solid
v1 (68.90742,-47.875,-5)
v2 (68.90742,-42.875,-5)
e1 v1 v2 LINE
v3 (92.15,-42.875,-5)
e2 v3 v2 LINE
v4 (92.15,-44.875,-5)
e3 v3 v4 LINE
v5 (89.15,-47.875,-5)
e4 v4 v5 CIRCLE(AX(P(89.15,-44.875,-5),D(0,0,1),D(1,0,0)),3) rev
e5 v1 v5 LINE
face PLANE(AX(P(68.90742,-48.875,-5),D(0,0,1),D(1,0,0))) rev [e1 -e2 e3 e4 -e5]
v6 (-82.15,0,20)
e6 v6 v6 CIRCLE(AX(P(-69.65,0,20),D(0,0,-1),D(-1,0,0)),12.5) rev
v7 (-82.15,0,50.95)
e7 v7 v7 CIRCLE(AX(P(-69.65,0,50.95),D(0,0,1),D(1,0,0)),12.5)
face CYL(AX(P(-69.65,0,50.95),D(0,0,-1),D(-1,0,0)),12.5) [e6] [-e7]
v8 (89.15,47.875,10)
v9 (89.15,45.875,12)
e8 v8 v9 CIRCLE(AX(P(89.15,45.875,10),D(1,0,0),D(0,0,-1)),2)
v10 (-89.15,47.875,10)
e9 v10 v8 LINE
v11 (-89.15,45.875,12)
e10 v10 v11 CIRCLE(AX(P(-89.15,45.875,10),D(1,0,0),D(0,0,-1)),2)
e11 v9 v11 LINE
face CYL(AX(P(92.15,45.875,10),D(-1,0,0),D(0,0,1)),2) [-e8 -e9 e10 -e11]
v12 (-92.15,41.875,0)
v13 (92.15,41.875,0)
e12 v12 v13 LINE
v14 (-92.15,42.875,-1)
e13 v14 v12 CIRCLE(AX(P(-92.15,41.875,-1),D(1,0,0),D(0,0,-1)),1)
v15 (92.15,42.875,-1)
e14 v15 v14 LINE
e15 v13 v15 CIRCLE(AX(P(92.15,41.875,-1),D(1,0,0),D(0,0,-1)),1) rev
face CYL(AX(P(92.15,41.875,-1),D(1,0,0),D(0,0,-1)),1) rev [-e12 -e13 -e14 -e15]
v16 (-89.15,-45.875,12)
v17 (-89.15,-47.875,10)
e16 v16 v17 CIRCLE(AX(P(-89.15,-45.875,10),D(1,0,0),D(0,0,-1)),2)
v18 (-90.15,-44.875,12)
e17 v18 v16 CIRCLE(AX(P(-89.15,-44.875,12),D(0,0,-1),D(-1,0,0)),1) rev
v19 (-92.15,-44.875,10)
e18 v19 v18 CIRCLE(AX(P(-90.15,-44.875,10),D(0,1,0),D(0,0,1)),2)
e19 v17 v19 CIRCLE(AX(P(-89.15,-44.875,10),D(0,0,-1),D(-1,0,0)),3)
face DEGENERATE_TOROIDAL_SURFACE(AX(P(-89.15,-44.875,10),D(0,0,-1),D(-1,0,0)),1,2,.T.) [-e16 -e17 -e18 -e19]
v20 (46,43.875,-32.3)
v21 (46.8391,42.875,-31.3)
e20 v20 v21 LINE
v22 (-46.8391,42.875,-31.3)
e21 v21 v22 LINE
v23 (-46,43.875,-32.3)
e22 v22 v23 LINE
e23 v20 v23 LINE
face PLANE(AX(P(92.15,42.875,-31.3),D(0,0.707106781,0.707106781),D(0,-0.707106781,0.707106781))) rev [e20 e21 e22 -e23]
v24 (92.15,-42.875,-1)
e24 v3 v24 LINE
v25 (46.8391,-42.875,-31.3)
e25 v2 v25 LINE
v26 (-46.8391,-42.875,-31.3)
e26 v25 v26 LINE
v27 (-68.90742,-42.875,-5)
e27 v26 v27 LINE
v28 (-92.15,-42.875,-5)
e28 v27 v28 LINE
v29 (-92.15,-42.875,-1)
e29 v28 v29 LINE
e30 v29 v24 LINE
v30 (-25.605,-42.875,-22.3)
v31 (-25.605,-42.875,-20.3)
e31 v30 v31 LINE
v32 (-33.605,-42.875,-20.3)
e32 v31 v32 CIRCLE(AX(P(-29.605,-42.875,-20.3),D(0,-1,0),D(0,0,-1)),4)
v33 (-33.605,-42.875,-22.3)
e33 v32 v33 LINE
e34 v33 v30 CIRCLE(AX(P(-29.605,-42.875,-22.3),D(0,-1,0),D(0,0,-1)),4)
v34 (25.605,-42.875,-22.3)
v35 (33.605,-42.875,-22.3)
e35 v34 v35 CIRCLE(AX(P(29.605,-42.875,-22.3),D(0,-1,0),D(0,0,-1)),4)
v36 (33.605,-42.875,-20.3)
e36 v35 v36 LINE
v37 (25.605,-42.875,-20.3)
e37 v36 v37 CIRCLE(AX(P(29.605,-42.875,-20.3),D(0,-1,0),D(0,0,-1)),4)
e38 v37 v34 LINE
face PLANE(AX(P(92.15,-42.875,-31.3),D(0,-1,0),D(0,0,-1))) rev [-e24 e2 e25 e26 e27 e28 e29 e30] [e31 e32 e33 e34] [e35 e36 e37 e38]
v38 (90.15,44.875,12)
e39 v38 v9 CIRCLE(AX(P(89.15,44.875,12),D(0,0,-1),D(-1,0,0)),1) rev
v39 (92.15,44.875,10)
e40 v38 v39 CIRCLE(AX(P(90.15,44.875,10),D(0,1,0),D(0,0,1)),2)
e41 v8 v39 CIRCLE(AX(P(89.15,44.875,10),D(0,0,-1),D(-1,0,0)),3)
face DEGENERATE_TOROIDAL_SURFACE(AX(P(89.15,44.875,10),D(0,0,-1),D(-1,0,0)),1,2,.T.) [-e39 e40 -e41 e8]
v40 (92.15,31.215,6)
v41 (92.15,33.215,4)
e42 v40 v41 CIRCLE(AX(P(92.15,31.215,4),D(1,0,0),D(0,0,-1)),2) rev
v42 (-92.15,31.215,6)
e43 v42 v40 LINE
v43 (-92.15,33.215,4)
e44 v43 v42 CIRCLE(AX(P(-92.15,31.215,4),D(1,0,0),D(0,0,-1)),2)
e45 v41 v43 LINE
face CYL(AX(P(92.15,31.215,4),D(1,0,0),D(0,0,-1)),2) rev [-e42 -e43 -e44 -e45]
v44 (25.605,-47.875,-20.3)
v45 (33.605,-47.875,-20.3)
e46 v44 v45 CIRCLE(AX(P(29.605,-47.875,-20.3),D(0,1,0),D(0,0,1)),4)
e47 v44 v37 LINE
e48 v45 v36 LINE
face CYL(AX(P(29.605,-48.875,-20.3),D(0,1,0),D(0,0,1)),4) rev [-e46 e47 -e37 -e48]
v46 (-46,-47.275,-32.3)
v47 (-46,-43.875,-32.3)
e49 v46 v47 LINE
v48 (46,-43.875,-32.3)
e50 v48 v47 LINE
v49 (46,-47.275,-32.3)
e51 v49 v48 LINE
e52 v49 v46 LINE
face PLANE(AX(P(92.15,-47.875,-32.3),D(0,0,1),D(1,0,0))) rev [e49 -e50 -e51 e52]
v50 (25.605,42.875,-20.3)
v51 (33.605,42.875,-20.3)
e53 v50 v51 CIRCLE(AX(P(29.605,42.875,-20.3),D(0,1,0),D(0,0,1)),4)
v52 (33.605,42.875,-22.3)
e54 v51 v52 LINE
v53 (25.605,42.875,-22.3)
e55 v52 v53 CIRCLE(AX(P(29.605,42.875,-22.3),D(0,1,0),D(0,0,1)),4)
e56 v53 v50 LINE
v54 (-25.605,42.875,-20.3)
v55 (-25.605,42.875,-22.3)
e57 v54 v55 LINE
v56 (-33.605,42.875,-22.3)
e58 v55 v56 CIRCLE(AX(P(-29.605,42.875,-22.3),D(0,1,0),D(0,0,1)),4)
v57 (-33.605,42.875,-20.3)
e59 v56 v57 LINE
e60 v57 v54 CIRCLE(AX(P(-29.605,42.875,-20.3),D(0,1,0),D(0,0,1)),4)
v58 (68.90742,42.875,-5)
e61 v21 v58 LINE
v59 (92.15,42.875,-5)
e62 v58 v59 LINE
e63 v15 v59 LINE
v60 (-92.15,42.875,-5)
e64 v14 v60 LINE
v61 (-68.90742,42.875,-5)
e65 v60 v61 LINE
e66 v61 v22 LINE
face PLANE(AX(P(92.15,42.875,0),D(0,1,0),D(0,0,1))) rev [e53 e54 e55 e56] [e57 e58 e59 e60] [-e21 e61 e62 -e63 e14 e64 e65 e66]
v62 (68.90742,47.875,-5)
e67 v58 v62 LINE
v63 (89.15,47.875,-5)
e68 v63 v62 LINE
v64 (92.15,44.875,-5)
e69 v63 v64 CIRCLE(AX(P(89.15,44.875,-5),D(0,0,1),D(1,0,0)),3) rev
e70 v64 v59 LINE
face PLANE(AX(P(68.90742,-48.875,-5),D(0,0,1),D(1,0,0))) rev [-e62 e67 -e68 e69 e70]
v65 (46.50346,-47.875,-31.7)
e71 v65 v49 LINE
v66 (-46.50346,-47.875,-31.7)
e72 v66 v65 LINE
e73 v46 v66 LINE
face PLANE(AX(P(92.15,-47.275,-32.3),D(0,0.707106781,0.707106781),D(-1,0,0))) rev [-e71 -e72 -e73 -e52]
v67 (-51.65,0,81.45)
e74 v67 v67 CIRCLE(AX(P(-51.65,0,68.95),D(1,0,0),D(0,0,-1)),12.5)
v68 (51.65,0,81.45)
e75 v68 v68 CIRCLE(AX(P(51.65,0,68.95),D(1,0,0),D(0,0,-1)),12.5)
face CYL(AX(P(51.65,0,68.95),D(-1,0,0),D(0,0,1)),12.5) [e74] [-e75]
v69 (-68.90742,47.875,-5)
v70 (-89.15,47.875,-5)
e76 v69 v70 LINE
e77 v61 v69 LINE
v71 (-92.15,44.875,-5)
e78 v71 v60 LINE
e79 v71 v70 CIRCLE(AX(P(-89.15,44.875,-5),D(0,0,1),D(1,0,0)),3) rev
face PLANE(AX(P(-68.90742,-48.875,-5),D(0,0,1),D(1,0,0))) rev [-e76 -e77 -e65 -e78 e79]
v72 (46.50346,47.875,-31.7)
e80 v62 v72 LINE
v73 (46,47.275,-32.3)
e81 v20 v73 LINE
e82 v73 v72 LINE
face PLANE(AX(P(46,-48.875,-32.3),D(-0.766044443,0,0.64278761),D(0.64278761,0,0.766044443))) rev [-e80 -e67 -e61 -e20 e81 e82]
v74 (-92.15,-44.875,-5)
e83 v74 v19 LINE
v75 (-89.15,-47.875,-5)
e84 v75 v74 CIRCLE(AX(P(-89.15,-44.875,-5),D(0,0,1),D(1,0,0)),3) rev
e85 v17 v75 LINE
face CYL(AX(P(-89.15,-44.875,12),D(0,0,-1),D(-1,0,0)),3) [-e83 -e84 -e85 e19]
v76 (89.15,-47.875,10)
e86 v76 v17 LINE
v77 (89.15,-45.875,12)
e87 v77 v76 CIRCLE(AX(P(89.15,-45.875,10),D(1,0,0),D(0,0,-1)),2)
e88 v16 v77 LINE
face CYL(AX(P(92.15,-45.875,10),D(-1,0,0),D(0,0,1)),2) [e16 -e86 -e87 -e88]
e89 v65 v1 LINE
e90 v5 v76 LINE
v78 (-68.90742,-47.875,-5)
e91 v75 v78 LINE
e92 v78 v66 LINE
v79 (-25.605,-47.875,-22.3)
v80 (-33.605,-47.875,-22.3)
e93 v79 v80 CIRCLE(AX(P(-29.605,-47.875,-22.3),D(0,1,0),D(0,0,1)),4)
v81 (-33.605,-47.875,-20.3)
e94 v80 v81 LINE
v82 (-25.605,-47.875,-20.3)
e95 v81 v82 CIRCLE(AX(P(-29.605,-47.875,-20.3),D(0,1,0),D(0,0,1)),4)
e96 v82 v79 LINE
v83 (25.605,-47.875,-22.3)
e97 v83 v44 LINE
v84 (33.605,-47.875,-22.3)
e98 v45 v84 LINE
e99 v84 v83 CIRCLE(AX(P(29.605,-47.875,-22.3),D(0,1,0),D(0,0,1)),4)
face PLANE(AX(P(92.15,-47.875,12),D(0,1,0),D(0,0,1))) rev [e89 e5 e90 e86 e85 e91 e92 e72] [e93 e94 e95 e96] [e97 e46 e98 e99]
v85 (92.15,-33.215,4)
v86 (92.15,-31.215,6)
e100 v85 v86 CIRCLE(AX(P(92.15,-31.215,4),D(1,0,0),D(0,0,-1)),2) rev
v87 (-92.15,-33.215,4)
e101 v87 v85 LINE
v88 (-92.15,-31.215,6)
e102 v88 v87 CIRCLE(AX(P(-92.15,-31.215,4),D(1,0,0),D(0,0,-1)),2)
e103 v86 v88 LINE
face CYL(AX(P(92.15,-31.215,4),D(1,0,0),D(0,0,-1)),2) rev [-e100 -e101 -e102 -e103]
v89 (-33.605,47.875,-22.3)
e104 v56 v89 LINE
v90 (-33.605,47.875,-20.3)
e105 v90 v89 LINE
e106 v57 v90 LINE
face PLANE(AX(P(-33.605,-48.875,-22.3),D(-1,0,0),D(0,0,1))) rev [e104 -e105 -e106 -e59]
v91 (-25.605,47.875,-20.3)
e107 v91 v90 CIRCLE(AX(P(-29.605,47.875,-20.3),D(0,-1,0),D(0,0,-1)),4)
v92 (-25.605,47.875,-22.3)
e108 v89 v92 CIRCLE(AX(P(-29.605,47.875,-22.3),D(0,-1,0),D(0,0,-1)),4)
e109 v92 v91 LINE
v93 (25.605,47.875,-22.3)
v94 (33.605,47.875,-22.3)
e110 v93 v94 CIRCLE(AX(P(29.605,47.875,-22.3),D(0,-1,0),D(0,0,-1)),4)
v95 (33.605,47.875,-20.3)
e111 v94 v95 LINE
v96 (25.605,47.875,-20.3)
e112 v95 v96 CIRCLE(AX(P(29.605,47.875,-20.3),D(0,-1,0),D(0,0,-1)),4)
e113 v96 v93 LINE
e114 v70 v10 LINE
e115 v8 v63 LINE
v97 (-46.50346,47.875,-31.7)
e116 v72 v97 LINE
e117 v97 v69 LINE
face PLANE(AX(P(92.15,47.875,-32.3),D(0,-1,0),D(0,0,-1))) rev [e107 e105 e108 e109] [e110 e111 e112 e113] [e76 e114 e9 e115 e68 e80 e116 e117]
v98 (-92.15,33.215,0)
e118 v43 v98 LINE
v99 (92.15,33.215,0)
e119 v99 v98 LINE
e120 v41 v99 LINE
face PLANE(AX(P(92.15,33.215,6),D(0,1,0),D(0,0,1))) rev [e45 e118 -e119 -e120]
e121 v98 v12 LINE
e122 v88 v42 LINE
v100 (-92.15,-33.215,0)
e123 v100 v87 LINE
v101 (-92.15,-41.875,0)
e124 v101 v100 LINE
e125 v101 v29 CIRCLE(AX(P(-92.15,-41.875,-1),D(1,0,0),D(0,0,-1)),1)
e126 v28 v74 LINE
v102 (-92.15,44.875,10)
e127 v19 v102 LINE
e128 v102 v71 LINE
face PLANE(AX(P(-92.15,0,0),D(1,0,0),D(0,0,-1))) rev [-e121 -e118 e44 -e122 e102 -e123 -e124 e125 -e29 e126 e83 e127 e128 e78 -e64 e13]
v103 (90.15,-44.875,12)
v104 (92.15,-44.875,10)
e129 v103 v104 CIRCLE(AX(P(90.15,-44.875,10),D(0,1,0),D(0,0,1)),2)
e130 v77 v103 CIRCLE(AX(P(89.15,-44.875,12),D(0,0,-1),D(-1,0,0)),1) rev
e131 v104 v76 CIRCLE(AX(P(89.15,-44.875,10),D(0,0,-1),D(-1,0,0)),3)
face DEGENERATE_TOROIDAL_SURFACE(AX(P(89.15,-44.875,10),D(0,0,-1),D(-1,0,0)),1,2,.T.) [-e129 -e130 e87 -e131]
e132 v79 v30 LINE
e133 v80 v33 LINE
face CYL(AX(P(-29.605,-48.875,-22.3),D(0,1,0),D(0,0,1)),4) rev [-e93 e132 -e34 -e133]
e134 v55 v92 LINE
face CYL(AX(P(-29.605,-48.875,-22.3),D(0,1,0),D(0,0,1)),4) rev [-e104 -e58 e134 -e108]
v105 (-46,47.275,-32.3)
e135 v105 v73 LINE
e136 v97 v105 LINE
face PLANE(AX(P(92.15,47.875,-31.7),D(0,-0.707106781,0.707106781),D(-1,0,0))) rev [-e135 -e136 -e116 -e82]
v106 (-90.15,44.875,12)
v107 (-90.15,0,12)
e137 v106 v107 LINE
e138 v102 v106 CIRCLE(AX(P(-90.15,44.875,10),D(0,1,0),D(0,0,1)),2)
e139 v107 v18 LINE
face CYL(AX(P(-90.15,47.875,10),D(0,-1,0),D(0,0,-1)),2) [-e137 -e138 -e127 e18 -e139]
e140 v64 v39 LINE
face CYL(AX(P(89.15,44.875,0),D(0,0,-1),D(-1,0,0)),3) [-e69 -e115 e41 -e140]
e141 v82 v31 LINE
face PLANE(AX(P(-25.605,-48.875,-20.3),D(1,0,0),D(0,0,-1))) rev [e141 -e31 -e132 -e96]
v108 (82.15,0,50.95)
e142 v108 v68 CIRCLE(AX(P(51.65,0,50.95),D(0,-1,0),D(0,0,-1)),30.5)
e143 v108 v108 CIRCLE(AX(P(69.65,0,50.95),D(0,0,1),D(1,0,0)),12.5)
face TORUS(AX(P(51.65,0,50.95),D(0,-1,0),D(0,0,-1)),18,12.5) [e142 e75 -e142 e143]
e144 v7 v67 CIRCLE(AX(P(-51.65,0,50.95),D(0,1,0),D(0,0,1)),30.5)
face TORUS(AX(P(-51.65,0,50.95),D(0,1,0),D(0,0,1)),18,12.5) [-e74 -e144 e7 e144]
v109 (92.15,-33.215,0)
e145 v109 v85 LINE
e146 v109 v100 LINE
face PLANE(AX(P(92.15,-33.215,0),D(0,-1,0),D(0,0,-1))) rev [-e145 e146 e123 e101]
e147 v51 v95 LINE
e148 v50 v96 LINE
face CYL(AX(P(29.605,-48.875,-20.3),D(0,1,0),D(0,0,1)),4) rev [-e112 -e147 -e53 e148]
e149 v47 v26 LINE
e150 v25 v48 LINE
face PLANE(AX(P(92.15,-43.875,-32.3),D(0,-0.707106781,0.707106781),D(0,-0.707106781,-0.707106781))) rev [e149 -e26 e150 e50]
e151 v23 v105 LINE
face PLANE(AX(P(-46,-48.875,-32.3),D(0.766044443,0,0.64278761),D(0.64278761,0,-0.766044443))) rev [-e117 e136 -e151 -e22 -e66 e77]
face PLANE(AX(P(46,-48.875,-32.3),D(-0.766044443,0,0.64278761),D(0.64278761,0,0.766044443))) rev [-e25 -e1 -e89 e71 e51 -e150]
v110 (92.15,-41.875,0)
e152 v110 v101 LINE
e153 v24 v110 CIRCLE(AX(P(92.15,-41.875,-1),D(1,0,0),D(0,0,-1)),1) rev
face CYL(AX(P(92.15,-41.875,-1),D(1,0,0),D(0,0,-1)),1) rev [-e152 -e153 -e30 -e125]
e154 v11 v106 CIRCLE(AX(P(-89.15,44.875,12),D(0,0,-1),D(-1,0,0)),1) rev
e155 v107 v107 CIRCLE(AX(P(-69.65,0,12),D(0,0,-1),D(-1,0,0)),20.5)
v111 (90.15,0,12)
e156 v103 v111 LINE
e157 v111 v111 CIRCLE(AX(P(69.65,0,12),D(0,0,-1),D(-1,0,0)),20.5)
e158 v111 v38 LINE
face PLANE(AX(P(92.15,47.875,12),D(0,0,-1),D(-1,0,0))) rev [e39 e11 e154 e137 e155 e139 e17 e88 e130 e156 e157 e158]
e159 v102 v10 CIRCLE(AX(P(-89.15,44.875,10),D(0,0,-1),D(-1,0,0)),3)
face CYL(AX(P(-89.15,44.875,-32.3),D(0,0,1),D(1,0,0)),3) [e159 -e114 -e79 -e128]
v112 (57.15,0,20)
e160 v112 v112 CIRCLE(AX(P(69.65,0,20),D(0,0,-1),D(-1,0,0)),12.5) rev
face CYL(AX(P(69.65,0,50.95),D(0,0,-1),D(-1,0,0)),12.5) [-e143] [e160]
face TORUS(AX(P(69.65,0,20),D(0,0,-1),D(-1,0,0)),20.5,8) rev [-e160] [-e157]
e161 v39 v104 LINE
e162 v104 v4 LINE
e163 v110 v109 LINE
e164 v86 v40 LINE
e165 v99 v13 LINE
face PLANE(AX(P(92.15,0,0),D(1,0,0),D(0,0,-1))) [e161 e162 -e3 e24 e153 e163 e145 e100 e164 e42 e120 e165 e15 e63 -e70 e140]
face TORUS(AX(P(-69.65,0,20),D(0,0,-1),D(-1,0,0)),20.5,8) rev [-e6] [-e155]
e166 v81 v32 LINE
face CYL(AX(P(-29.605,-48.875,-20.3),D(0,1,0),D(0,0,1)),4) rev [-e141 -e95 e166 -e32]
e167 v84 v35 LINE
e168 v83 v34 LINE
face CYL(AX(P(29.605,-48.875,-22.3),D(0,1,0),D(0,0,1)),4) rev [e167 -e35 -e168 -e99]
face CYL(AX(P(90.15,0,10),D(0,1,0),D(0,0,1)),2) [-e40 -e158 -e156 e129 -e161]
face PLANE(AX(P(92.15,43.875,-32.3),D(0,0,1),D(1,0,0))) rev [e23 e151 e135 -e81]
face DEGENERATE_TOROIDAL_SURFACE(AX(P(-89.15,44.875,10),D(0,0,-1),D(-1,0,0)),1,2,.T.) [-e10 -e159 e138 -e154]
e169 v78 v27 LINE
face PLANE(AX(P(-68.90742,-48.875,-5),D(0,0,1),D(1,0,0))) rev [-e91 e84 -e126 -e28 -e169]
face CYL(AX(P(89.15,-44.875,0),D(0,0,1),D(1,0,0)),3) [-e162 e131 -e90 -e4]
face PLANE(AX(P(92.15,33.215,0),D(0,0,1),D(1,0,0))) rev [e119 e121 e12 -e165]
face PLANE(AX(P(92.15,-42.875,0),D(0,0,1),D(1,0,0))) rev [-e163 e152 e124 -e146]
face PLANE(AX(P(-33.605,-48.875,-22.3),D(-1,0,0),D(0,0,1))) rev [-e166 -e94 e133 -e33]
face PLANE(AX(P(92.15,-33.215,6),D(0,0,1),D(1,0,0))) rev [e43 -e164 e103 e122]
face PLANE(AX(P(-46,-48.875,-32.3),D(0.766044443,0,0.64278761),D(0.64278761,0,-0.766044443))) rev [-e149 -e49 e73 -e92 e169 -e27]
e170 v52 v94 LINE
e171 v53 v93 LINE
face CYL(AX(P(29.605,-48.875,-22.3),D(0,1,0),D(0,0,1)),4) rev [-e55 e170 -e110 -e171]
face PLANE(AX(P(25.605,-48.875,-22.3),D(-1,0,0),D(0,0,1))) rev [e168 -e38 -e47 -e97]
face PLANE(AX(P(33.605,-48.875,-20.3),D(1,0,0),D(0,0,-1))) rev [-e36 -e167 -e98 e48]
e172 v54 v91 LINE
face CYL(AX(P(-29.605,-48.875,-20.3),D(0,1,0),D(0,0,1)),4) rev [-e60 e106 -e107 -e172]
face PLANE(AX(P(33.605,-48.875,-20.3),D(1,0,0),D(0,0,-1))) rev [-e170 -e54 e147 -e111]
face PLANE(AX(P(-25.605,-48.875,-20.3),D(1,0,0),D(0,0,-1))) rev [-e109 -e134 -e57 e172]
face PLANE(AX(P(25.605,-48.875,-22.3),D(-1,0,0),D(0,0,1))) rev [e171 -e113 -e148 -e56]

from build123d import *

# Parameters (mm, degrees)
SADDLE_DEPTH        = 92.15
SKIRT_CUT_X_DEPTH   = 48.875
SKIRT_CUT_X_2_DEPTH = 48.875
BAIL_LEGS_SKETCH_R  = 12.5
BAIL_LEGS_DEPTH     = 19.975
GRIP_BAR_SKETCH_R   = 12.5
GRIP_BAR_DEPTH      = 51.65
ELBOW_X_SKETCH_R    = 12.5
ELBOW_X_ANGLE       = 90
ELBOW_X_SKETCH_2_R  = 12.5
ELBOW_X_2_ANGLE     = 90
M6_SLOTS_X_DEPTH    = 48.875
M6_SLOTS_X_2_DEPTH  = 48.875
BAIL_BASE_X_R       = 8
BAIL_BASE_X_2_R     = 8
RECESS_CORNERS_R    = 2
LAND_CORNERS_R      = 1
ROOF_CORNERS_R      = 3
ROOF_TOP_EDGE_R     = 2
BED_CHAMFER_SIZE    = 0.6


with BuildPart() as part:
    # saddle sketch → saddle (new, symmetric)
    with BuildSketch(Plane(origin=(0, 0, 0), x_dir=(0, 0, -1), z_dir=(1, 0, 0))):
        Polygon((32.3, 47.875), (-12, 47.875), (-12, -47.875), (32.3, -47.875), (32.3, -43.875), (31.3, -42.875), (0, -42.875), (0, -33.215), (-6, -33.215), (-6, 33.215), (0, 33.215), (0, 42.875), (31.3, 42.875), (32.3, 43.875), align=None)
    extrude(amount=SADDLE_DEPTH, both=True)

    # Sketch2 → skirt cut _x (cut, symmetric)
    with BuildSketch(Plane(origin=(0, 0, 0), x_dir=(1, 0, 0), z_dir=(0, 1, 0))):
        Polygon((46, 33.3), (46, 32.3), (68.907419931, 5), (93.15, 5), (93.15, 33.3), align=None)
    extrude(amount=SKIRT_CUT_X_DEPTH, both=True, mode=Mode.SUBTRACT)

    # Sketch3 → skirt cut -x 2 (cut, symmetric)
    with BuildSketch(Plane(origin=(0, 0, 0), x_dir=(1, 0, 0), z_dir=(0, 1, 0))):
        Polygon((-46, 33.3), (-46, 32.3), (-68.907419931, 5), (-93.15, 5), (-93.15, 33.3), align=None)
    extrude(amount=SKIRT_CUT_X_2_DEPTH, both=True, mode=Mode.SUBTRACT)

    # bail legs sketch → bail legs (add, symmetric)
    with BuildSketch(Plane.XY.offset(30.975)):
        with Locations(Location((69.65, 0, 0), (0, 0, 180))):
            Circle(BAIL_LEGS_SKETCH_R)
        with Locations(Location((-69.65, 0, 0), (0, 0, 180))):
            Circle(BAIL_LEGS_SKETCH_R)
    extrude(amount=BAIL_LEGS_DEPTH, both=True)



with BuildPart() as body_2:
    # grip bar sketch → grip bar (new, symmetric)
    with BuildSketch(Plane(origin=(0, 0, 0), x_dir=(0, 0, -1), z_dir=(1, 0, 0))):
        with Locations((-68.95, 0)):
            Circle(GRIP_BAR_SKETCH_R)
    extrude(amount=GRIP_BAR_DEPTH, both=True)


with BuildPart() as part_1:
    add(part.part)

    add(body_2.part)  # elbow _x merges body 2
    # elbow _x sketch → elbow _x (revolve)
    with BuildSketch(Plane(origin=(51.65, 0, 0), x_dir=(0, 0, -1), z_dir=(1, 0, 0))):
        with Locations(Location((-68.95, 0, 0), (0, 0, 180))):
            Circle(ELBOW_X_SKETCH_R)
    revolve(axis=Axis((51.65, -30, 50.95), (0, 1, 0)), revolution_arc=ELBOW_X_ANGLE)

    # elbow -x sketch 2 → elbow -x 2 (revolve)
    with BuildSketch(Plane(origin=(-51.65, 0, 0), x_dir=(0, 0, -1), z_dir=(1, 0, 0))):
        with Locations(Location((-68.95, 0, 0), (0, 0, 180))):
            Circle(ELBOW_X_SKETCH_2_R)
    revolve(axis=Axis((-51.65, -30, 50.95), (0, -1, 0)), revolution_arc=ELBOW_X_2_ANGLE)

    # Sketch9 → M6 slots _x (cut, symmetric)
    with BuildSketch(Plane(origin=(0, 0, 0), x_dir=(1, 0, 0), z_dir=(0, 1, 0))):
        with BuildLine():
            Line((25.605, 22.3), (25.605, 20.3))
            ThreePointArc((25.605, 20.3), (29.605, 16.3), (33.605, 20.3))
            Line((33.605, 20.3), (33.605, 22.3))
            ThreePointArc((33.605, 22.3), (29.605, 26.3), (25.605, 22.3))
        make_face()
    extrude(amount=M6_SLOTS_X_DEPTH, both=True, mode=Mode.SUBTRACT)

    # Sketch10 → M6 slots -x 2 (cut, symmetric)
    with BuildSketch(Plane(origin=(0, 0, 0), x_dir=(1, 0, 0), z_dir=(0, 1, 0))):
        with BuildLine():
            Line((-33.605, 22.3), (-33.605, 20.3))
            ThreePointArc((-33.605, 20.3), (-29.605, 16.3), (-25.605, 20.3))
            Line((-25.605, 20.3), (-25.605, 22.3))
            ThreePointArc((-25.605, 22.3), (-29.605, 26.3), (-33.605, 22.3))
        make_face()
    extrude(amount=M6_SLOTS_X_2_DEPTH, both=True, mode=Mode.SUBTRACT)

    # bail base _x
    bail_base_x_edges = [part_1.edges().sort_by_distance(p)[0] for p in [
        (82.15, 0, 12),
    ]]
    fillet(bail_base_x_edges, radius=BAIL_BASE_X_R)

    # bail base -x 2
    bail_base_x_2_edges = [part_1.edges().sort_by_distance(p)[0] for p in [
        (-57.15, 0, 12),
    ]]
    fillet(bail_base_x_2_edges, radius=BAIL_BASE_X_2_R)

    # recess corners
    recess_corners_edges = [part_1.edges().sort_by_distance(p)[0] for p in [
        (0, 33.215, 6),
        (0, -33.215, 6),
    ]]
    fillet(recess_corners_edges, radius=RECESS_CORNERS_R)

    # land corners
    land_corners_edges = [part_1.edges().sort_by_distance(p)[0] for p in [
        (0, 42.875, 0),
        (0, -42.875, 0),
    ]]
    fillet(land_corners_edges, radius=LAND_CORNERS_R)

    # roof corners
    roof_corners_edges = [part_1.edges().sort_by_distance(p)[0] for p in [
        (92.15, -47.875, 3.5),
        (-92.15, -47.875, 3.5),
        (92.15, 47.875, 3.5),
        (-92.15, 47.875, 3.5),
    ]]
    fillet(roof_corners_edges, radius=ROOF_CORNERS_R)

    # roof top edge
    roof_top_edge_edges = [part_1.edges().sort_by_distance(p)[0] for p in [
        (0, -47.875, 12),
        (-92.15, 0, 12),
        (92.15, 0, 12),
        (0, 47.875, 12),
        (91.271320344, 46.996320344, 12),
        (91.271320344, -46.996320344, 12),
        (-91.271320344, 46.996320344, 12),
        (-91.271320344, -46.996320344, 12),
    ]]
    fillet(roof_top_edge_edges, radius=ROOF_TOP_EDGE_R - 0.0001)  # a hair under: the kernel refuses the full size

    # bed chamfer
    bed_chamfer_edges = [part_1.edges().sort_by_distance(p)[0] for p in [
        (0, -47.875, -32.3),
        (0, 47.875, -32.3),
    ]]
    chamfer(bed_chamfer_edges, length=BED_CHAMFER_SIZE)


solid = part_1.part
